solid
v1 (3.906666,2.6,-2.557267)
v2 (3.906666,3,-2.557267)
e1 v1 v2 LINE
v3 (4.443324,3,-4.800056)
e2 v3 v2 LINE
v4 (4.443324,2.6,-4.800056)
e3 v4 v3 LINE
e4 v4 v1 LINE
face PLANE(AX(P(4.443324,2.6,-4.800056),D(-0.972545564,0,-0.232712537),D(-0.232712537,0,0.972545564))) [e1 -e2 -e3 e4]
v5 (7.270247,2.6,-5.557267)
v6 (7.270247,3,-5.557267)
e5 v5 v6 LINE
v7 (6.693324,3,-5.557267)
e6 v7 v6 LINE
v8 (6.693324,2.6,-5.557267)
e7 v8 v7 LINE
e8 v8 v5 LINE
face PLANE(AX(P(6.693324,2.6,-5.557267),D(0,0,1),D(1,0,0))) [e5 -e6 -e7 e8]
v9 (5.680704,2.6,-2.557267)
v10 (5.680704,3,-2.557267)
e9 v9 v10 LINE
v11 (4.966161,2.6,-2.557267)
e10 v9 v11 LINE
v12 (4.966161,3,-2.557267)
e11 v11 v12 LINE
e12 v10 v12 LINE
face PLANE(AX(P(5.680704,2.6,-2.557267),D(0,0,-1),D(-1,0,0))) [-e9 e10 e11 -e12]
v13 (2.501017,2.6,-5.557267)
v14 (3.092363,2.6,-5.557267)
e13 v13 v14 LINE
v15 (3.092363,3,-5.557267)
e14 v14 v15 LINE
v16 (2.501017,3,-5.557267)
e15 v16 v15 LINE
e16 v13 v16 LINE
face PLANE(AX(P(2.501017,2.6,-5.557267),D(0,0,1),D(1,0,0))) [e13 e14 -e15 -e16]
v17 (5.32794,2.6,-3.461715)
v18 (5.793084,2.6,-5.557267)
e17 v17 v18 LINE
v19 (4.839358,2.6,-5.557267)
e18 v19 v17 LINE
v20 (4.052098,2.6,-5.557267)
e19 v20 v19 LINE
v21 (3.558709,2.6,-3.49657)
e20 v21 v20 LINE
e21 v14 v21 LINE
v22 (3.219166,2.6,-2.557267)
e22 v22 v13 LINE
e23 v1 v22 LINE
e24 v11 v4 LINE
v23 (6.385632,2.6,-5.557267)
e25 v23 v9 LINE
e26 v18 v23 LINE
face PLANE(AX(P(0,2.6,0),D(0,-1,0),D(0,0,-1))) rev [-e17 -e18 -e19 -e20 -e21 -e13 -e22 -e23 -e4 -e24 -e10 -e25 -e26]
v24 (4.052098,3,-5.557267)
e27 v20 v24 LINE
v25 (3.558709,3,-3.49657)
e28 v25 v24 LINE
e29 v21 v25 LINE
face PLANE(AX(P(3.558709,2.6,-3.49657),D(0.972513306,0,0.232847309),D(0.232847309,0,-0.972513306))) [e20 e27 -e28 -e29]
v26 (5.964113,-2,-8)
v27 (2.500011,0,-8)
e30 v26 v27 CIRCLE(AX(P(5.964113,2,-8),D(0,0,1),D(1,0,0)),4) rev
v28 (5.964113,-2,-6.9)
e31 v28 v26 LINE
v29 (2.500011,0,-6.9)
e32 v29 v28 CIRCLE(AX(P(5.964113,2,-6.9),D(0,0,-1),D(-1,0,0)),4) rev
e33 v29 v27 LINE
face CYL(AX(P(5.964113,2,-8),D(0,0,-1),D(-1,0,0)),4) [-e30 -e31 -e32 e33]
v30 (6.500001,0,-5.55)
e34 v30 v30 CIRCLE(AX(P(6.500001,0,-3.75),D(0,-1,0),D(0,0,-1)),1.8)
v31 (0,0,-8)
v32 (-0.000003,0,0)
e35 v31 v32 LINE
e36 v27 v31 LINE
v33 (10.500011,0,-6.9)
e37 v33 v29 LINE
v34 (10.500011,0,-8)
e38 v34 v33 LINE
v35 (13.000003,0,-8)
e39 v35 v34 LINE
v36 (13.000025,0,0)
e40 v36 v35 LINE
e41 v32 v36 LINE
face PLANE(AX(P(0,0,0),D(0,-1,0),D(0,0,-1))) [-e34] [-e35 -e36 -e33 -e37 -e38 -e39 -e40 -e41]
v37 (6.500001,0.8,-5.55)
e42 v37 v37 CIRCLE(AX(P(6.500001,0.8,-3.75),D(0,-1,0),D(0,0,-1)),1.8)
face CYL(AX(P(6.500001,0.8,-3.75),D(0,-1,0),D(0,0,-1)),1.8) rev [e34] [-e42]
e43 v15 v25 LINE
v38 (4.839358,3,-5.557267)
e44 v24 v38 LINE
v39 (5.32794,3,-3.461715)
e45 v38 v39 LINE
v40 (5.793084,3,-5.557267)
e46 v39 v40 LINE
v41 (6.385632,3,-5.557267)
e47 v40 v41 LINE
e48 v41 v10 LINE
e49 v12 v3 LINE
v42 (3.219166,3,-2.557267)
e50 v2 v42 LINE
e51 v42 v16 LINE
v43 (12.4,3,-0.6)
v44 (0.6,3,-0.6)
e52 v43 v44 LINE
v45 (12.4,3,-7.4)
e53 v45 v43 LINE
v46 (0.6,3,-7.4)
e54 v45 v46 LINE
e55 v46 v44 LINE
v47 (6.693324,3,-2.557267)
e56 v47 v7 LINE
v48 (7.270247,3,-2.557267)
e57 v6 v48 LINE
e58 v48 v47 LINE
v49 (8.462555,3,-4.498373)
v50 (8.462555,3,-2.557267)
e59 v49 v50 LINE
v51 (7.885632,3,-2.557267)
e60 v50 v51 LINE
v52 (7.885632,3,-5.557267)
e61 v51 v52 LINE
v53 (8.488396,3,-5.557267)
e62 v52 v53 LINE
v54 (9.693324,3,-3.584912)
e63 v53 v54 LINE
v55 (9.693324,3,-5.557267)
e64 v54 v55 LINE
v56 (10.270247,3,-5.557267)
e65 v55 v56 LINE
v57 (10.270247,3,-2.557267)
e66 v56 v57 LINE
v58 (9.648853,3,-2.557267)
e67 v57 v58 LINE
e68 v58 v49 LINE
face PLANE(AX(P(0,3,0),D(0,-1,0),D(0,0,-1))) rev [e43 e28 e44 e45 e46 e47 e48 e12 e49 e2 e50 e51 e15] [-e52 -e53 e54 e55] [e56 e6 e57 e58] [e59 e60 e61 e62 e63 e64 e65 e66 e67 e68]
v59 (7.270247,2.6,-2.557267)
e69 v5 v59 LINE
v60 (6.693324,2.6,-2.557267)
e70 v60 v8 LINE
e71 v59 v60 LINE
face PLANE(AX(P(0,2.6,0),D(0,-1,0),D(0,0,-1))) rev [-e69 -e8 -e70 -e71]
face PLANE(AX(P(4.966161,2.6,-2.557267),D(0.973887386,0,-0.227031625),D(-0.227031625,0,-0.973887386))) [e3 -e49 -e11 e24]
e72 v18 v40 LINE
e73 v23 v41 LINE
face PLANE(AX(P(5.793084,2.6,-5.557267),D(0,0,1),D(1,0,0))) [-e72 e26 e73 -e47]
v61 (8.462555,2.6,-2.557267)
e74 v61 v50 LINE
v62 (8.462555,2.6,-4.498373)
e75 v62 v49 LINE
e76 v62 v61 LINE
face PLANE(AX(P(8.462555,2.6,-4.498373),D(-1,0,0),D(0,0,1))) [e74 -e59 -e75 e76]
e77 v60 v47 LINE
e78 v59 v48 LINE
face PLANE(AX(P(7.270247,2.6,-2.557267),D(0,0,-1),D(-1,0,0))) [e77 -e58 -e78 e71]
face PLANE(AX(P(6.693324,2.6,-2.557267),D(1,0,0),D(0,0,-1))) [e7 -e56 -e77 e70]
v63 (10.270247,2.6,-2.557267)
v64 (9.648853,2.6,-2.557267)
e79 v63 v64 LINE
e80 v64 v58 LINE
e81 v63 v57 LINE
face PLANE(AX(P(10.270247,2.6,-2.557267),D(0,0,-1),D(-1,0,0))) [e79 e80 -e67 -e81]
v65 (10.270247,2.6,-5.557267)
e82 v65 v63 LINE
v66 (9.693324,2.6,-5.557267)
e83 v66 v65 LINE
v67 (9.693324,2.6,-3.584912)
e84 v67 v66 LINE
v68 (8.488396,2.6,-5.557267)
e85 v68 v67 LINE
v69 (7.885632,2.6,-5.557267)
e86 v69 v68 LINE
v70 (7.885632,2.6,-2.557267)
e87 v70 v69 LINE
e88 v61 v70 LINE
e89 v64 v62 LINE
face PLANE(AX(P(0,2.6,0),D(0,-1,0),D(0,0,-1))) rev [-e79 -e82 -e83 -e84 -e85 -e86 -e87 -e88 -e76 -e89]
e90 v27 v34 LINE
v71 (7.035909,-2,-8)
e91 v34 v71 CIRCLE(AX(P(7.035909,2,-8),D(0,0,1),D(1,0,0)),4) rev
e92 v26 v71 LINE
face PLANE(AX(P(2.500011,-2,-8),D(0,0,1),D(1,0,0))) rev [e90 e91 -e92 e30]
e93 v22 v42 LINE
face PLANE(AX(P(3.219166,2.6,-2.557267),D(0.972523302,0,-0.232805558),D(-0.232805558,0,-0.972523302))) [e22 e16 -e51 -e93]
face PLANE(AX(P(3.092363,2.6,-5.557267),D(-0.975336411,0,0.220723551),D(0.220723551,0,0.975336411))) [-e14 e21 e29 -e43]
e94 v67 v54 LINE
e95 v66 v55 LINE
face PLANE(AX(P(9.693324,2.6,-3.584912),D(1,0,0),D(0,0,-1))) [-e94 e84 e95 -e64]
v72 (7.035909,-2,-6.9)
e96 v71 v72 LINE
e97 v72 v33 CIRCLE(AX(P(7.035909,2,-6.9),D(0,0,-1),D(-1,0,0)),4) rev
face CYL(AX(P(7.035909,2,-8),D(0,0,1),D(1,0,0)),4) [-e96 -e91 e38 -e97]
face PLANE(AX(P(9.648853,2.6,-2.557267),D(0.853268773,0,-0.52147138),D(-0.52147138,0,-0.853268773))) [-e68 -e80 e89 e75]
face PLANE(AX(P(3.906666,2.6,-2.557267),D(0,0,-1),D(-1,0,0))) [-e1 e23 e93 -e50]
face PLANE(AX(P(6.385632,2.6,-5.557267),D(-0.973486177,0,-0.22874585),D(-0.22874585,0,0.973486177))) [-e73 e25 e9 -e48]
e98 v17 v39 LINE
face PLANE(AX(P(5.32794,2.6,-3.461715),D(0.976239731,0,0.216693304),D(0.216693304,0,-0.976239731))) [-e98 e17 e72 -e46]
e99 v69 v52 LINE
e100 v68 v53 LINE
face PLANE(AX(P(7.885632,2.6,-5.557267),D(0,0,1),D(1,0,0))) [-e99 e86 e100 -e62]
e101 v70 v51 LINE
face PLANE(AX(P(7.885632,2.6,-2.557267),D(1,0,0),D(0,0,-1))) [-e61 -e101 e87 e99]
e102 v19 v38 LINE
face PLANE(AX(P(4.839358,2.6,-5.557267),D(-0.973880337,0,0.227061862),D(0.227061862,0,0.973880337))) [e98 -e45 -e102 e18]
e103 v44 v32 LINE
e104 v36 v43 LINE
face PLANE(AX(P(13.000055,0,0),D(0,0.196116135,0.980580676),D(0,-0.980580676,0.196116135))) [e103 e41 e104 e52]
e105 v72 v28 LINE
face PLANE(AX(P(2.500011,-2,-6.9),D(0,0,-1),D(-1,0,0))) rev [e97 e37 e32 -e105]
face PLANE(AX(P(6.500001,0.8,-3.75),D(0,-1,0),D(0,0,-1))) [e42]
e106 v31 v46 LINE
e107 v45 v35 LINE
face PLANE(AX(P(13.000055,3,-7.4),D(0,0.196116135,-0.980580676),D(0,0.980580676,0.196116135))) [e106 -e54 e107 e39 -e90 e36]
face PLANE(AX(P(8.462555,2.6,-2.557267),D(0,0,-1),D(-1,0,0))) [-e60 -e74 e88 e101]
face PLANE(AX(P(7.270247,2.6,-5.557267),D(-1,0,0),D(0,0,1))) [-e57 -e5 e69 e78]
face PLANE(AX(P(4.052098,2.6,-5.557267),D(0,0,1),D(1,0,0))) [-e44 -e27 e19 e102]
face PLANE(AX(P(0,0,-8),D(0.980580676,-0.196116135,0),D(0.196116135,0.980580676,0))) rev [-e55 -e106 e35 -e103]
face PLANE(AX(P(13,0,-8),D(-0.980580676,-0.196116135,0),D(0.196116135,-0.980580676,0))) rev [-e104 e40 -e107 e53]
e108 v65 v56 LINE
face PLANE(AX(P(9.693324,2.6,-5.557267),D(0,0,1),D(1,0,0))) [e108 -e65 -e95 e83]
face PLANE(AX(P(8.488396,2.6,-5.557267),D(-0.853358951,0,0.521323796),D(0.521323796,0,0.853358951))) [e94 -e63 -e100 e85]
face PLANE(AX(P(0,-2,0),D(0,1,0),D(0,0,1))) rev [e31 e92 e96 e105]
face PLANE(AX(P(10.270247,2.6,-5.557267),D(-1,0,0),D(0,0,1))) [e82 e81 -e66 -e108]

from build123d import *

# Parameters (mm, degrees)
SKETCH1_W               = 13
SKETCH1_H               = 8
BOSS_EXTRUDE1_DEPTH     = 3
CUT_EXTRUDE1_DEPTH      = 16.556349186
CUT_EXTRUDE1_DEPTH_BACK = 16.556349186
CUT_EXTRUDE2_DEPTH      = 16.556349186
CUT_EXTRUDE2_DEPTH_BACK = 16.556349186
SKETCH4_R               = 1.8
CUT_EXTRUDE3_DEPTH      = 0.8
SKETCH5_W               = 8
SKETCH5_H               = 1.1
BOSS_EXTRUDE2_DEPTH     = 2
FILLET1_R               = 4
SKETCH6_W               = 0.576923077
SKETCH6_H               = 3
CUT_EXTRUDE4_DEPTH      = 0.4


with BuildPart() as part:
    # Sketch1 → Boss-Extrude1 (new body)
    with BuildSketch(Plane(origin=(0, 0, 0), x_dir=(1, 0, 0), z_dir=(0, 1, 0))):
        with Locations((6.5, 4)):
            Rectangle(SKETCH1_W, SKETCH1_H)
    extrude(amount=BOSS_EXTRUDE1_DEPTH)

    # Sketch2 → Cut-Extrude1 (cut, two sides: drawn at the far end of the back side and taken through both)
    with BuildSketch(Plane.XY.offset(-CUT_EXTRUDE1_DEPTH_BACK)):
        Polygon((0, 0), (0.6, 3), (0, 3), align=None)
        Polygon((13, 0), (12.4, 3), (13, 3), align=None)
    extrude(amount=CUT_EXTRUDE1_DEPTH + CUT_EXTRUDE1_DEPTH_BACK, mode=Mode.SUBTRACT)

    # Sketch3 → Cut-Extrude2 (cut, two sides: drawn at the far end of the back side and taken through both)
    with BuildSketch(Plane(origin=(0, 0, 0), x_dir=(0, 0, -1), z_dir=(1, 0, 0)).offset(-CUT_EXTRUDE2_DEPTH_BACK)):
        Polygon((0, 0), (0.6, 3), (0, 3), align=None)
        Polygon((8, 3), (7.4, 3), (8, 0), align=None)
    extrude(amount=CUT_EXTRUDE2_DEPTH + CUT_EXTRUDE2_DEPTH_BACK, mode=Mode.SUBTRACT)

    # Sketch4 → Cut-Extrude3 (cut)
    with BuildSketch(Plane.XZ):
        with Locations(Location((6.50000125, -3.75, 0), (0, 0, 270))):
            Circle(SKETCH4_R)
    extrude(amount=-CUT_EXTRUDE3_DEPTH, mode=Mode.SUBTRACT)

    # Sketch5 → Boss-Extrude2 (add)
    with BuildSketch(Plane.XZ):
        with Locations((6.500011, -7.45)):
            Rectangle(SKETCH5_W, SKETCH5_H)
    extrude(amount=BOSS_EXTRUDE2_DEPTH)

    # Fillet1
    # the kernel refuses this fillet: 4 mm, written as the material it takes off along each edge
    with BuildSketch(Plane(origin=(10.500011, -2, -16.660254038), x_dir=(0, 1, 0), z_dir=(0, 0, 1)), Plane(origin=(2.500011, -2, 1.760254038), x_dir=(0, 1, 0), z_dir=(0, 0, -1))) as fillet1_piece_1:
        with BuildLine():
            CenterArc((4, 3.464101615), FILLET1_R, 180, 60)
            Line((0, 3.464101615), (-0.08, 3.464101615))
            Line((-0.08, 3.464101615), (-0.08, 0))
            Line((-0.08, 0), (0, -0.08))
            ThreePointArc((0, -0.08), (1, -0.08), (1.96, -0.069282032))
            Line((1.96, -0.069282032), (2, 0))
        make_face()
    extrude(amount=18.420508076, mode=Mode.SUBTRACT)

    # Sketch6 → Cut-Extrude4 (cut)
    with BuildSketch(Plane(origin=(0, 3, 0), x_dir=(1, 0, 0), z_dir=(0, 1, 0))):
        Polygon((3.219165588, 2.557267472), (2.50101655, 5.557267472), (3.092362704, 5.557267472), (3.558708858, 3.496570357), (4.052098281, 5.557267472), (4.839357896, 5.557267472), (5.327939627, 3.461714587), (5.793083858, 5.557267472), (6.385631934, 5.557267472), (5.68070405, 2.557267472), (4.966160781, 2.557267472), (4.443324242, 4.800055934), (3.906665588, 2.557267472), align=None)
        with Locations((6.981785781, 4.057267472)):
            Rectangle(SKETCH6_W, SKETCH6_H)
        Polygon((7.885631934, 2.557267472), (7.885631934, 5.557267472), (8.488396358, 5.557267472), (9.693324242, 3.584911703), (9.693324242, 5.557267472), (10.270247319, 5.557267472), (10.270247319, 2.557267472), (9.648853088, 2.557267472), (8.462555011, 4.498373241), (8.462555011, 2.557267472), align=None)
    extrude(amount=-CUT_EXTRUDE4_DEPTH, mode=Mode.SUBTRACT)


solid = part.part
